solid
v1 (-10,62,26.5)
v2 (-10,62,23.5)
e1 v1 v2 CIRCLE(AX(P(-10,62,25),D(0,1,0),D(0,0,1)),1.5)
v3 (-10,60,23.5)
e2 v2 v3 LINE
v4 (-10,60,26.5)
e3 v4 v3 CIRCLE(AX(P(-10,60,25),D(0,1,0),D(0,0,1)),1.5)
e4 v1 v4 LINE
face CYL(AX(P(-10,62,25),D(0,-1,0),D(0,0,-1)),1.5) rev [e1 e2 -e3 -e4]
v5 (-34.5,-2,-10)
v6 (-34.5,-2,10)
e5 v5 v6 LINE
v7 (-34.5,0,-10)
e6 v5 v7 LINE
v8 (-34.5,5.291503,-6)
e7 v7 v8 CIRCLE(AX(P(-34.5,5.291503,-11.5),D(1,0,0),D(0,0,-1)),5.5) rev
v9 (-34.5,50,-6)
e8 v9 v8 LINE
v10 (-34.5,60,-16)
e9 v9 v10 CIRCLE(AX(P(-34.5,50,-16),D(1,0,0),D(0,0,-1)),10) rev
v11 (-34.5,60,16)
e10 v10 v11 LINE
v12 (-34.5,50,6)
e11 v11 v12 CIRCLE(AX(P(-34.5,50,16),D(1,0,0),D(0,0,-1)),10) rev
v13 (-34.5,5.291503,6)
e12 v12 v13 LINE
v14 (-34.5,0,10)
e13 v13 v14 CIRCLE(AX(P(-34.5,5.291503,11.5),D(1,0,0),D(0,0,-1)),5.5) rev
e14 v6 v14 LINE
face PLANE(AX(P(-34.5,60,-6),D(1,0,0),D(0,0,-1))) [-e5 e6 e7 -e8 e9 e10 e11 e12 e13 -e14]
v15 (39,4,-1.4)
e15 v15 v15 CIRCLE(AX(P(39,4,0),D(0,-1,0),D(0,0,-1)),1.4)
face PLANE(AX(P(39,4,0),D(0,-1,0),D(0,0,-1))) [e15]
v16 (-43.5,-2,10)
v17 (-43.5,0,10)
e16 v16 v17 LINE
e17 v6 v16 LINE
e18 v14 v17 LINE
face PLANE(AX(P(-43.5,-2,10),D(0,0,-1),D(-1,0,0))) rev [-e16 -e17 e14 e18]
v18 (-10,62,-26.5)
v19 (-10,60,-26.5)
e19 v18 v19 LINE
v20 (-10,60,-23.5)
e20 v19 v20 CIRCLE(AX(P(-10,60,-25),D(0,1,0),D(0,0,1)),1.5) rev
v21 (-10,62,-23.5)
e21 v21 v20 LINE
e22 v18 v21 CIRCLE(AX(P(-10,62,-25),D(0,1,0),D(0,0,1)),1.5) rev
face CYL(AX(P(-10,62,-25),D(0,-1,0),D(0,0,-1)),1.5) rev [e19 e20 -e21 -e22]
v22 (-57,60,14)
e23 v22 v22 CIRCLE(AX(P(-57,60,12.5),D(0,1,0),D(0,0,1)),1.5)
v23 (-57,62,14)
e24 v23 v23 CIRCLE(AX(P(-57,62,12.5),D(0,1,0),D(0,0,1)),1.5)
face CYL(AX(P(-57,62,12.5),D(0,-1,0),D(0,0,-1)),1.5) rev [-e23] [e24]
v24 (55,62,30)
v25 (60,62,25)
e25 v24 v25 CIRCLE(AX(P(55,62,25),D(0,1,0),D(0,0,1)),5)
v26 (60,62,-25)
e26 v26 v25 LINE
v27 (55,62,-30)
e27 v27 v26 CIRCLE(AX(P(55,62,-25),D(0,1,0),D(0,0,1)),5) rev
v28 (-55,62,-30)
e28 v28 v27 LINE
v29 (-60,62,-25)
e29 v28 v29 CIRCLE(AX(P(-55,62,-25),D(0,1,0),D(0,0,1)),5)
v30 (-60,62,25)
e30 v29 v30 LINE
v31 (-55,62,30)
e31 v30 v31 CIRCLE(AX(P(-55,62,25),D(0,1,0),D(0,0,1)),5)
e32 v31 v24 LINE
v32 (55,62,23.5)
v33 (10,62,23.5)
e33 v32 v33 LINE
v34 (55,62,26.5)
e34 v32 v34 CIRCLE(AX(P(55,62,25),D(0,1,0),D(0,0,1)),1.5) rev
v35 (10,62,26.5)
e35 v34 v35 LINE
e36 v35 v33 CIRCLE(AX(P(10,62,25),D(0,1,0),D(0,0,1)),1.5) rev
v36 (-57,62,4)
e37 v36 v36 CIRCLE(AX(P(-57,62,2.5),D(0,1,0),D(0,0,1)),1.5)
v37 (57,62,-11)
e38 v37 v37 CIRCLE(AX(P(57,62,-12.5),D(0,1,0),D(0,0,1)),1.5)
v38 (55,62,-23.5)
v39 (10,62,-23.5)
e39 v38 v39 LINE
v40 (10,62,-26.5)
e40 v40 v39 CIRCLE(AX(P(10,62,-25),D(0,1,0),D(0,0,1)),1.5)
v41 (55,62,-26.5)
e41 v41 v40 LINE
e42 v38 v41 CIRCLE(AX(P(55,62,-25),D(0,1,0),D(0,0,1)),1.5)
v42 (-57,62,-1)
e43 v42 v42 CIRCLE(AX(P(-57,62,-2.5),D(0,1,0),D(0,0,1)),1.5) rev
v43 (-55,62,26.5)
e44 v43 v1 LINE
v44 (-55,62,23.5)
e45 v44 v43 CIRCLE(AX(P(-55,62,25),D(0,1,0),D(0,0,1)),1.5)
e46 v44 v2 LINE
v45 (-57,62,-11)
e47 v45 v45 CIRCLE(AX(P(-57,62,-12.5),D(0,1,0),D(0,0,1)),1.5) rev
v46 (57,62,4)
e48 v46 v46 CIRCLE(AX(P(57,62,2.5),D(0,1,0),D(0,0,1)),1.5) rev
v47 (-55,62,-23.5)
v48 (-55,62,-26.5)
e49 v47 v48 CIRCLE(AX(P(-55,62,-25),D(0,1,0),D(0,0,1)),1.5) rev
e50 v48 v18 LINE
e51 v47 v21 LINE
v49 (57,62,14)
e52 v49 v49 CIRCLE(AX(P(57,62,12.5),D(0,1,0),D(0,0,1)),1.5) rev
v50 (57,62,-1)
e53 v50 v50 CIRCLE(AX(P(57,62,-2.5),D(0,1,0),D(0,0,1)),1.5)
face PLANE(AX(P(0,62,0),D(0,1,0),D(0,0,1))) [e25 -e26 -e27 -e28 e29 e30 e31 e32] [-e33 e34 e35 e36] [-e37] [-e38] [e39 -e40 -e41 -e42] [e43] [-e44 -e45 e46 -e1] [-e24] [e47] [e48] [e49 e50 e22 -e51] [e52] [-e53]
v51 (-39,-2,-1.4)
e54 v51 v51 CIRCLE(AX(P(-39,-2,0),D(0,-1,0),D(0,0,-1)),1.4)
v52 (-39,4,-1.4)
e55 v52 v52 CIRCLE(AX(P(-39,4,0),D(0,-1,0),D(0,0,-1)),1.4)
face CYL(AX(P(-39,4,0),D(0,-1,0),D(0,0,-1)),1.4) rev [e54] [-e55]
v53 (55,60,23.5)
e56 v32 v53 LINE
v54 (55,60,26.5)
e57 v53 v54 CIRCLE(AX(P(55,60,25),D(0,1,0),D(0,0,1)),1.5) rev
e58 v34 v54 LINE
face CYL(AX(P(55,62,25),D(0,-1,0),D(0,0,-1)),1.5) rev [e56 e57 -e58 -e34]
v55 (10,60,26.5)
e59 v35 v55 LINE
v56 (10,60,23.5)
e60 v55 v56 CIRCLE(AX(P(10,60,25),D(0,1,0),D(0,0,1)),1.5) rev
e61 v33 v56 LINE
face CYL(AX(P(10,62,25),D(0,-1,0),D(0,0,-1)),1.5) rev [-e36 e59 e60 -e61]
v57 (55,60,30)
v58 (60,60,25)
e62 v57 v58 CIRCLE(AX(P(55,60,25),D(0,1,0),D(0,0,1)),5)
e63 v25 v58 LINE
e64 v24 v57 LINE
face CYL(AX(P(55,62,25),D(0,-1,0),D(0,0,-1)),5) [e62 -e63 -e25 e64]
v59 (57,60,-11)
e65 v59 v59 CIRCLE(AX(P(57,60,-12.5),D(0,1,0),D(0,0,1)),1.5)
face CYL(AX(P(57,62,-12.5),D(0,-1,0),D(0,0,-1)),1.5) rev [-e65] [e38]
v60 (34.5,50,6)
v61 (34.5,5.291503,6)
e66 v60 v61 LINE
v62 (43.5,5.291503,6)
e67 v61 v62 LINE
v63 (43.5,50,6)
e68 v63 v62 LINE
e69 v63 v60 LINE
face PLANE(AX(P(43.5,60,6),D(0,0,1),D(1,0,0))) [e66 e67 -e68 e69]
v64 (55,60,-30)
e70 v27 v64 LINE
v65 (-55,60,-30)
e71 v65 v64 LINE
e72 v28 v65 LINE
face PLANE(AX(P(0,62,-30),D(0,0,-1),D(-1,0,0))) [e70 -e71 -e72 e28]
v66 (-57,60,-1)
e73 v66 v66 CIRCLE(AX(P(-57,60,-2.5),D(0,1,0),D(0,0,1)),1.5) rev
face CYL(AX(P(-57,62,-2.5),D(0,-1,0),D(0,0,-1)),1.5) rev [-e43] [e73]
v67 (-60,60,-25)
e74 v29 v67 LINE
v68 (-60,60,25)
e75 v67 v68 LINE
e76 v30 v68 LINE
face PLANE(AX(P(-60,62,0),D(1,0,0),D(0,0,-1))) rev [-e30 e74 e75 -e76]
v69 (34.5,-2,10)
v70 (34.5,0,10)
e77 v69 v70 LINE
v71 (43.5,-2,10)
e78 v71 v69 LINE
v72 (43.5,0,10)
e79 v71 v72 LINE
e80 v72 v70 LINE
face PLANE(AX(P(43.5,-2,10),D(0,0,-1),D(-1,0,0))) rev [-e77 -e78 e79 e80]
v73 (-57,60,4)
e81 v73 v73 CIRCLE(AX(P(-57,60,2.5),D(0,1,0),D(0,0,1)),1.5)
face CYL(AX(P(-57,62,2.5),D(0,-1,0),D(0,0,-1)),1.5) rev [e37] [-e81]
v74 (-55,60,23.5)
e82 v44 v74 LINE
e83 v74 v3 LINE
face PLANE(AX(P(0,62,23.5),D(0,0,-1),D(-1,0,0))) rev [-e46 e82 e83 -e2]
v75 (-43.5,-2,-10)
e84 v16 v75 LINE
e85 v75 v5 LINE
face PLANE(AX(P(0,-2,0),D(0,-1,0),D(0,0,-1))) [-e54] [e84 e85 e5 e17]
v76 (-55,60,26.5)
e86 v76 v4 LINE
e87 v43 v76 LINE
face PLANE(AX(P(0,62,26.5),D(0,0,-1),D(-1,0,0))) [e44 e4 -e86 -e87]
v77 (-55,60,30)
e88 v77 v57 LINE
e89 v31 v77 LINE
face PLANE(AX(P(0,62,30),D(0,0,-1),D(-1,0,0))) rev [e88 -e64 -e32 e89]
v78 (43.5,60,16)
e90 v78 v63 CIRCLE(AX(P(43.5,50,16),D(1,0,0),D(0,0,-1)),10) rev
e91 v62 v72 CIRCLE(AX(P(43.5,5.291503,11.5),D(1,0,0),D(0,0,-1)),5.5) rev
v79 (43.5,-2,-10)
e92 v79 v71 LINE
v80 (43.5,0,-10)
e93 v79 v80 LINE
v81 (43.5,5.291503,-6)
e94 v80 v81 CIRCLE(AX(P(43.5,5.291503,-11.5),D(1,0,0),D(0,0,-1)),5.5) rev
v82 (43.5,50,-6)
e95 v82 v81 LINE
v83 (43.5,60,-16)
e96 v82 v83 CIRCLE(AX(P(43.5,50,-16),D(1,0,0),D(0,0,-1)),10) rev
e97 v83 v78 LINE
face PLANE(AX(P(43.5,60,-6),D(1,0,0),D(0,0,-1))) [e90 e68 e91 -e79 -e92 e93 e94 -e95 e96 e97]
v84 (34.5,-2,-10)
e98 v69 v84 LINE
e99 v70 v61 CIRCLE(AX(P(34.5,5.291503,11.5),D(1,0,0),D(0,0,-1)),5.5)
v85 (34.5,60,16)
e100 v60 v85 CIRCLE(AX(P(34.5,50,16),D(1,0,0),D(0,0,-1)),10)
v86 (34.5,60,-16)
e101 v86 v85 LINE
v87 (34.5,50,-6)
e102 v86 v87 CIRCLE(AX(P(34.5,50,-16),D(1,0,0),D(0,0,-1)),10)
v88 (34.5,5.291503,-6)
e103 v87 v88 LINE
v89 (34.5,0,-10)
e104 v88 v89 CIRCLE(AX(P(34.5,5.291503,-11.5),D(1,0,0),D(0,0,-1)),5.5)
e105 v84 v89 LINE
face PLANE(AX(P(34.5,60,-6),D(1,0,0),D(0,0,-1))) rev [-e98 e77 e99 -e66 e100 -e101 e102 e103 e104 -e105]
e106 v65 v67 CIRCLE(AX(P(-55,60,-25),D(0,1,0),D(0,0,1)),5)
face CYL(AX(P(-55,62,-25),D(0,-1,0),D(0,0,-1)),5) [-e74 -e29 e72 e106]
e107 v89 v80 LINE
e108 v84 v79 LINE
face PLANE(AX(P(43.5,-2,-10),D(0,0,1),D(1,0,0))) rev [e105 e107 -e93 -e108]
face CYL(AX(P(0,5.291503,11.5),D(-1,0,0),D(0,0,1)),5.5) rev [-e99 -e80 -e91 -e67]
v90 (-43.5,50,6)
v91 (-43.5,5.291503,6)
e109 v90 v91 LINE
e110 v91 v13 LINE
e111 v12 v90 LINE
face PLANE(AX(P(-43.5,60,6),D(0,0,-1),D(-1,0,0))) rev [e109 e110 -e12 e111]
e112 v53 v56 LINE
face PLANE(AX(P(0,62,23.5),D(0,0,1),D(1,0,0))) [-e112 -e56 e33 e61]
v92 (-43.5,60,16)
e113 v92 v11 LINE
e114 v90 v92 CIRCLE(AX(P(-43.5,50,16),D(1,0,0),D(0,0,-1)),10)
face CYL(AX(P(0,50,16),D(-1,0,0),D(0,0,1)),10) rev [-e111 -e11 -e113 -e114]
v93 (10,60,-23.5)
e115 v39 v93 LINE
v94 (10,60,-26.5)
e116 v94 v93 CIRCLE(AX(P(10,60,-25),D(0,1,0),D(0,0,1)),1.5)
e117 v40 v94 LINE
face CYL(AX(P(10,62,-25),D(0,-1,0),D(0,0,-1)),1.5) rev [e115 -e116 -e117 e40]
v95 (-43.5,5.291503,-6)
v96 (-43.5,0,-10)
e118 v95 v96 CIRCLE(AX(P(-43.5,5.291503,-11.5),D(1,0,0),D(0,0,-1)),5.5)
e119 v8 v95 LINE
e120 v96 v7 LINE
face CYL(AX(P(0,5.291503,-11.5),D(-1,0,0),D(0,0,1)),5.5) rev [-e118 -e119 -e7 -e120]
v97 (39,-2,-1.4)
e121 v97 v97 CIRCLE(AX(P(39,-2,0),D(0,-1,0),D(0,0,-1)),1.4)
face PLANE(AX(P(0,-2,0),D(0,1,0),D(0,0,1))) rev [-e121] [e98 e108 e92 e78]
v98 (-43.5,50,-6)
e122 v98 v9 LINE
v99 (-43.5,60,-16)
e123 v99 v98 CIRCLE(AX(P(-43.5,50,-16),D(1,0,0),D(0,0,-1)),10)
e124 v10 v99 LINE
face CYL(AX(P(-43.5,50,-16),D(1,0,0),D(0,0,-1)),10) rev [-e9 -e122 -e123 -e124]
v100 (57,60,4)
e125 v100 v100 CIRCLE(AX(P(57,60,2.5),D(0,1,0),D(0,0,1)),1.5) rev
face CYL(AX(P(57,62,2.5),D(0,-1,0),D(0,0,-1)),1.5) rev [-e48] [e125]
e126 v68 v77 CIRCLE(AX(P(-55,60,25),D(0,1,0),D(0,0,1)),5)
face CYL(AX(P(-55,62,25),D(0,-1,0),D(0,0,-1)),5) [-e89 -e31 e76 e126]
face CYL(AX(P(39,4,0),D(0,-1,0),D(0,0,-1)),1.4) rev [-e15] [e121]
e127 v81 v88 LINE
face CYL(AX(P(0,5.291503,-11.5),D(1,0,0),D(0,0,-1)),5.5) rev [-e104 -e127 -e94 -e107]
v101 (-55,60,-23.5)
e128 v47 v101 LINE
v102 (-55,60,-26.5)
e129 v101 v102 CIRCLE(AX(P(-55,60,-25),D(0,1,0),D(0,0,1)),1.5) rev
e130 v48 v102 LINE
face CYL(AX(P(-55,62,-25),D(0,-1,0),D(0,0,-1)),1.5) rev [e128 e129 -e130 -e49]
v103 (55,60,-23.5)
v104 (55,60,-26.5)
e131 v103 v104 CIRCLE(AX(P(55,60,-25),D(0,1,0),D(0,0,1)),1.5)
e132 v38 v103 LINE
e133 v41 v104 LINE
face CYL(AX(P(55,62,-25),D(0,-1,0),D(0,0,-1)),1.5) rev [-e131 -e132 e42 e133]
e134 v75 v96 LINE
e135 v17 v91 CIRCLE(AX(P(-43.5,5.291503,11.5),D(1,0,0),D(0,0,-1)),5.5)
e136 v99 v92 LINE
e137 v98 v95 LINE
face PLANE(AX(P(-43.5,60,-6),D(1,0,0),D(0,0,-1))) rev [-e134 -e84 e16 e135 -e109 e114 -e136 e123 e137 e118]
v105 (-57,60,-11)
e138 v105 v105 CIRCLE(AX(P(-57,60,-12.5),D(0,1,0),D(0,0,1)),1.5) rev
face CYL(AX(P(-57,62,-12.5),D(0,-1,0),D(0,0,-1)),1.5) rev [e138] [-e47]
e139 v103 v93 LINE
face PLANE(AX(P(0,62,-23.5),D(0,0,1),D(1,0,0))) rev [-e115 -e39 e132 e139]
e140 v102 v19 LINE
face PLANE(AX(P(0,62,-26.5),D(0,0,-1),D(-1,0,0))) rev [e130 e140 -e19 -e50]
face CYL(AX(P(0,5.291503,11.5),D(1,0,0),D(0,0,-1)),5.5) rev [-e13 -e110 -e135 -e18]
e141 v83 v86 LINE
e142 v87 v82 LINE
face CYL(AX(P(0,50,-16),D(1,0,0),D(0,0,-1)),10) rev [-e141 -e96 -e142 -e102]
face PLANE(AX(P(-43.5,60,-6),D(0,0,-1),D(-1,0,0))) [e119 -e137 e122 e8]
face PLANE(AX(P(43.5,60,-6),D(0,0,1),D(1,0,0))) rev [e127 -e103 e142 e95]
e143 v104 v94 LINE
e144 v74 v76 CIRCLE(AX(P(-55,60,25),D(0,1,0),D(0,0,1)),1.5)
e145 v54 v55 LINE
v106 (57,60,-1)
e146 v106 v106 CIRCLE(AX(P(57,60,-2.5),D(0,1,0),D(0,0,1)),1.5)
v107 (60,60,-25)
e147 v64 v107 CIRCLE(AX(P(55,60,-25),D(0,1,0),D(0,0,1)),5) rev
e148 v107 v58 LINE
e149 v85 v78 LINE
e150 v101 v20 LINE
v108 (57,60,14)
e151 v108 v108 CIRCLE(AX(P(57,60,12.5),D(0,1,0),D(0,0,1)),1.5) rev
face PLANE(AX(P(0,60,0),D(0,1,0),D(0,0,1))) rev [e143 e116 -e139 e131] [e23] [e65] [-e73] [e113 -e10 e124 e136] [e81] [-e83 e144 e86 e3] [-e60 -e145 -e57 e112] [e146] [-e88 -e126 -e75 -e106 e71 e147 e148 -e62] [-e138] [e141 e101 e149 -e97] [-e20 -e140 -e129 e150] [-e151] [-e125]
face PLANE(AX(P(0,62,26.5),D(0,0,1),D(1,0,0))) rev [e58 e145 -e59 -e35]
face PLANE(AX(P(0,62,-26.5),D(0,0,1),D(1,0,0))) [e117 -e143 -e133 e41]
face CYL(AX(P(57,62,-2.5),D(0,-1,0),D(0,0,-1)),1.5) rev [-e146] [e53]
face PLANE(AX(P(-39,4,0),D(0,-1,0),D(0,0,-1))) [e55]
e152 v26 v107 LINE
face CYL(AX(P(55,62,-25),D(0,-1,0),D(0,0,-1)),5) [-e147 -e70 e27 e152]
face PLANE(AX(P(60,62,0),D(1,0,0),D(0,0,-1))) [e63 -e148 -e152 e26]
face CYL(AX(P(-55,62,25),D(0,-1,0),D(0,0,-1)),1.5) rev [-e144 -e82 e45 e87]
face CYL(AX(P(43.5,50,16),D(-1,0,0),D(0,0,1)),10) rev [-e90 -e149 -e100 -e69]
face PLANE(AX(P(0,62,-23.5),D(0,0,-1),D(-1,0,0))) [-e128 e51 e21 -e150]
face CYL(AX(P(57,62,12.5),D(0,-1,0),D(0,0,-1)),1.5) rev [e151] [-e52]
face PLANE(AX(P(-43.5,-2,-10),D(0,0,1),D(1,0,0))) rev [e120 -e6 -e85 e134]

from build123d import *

# Parameters (mm, degrees)
SKETCH1_W             = 9
SKETCH1_H             = 12
BOSS_EXTRUDE1_DEPTH   = 60
BOSS_EXTRUDE1_2_DEPTH = 60
SKETCH2_W             = 9
SKETCH2_H             = 20
BOSS_EXTRUDE2_DEPTH   = 2
SKETCH3_R             = 1.4
CUT_EXTRUDE1_DEPTH    = 6
FILLET1_R             = 5.5
FILLET2_R             = 5.5
SKETCH4_R             = 1.5
BOSS_EXTRUDE4_DEPTH   = 2
FILLET4_R             = 10


with BuildPart() as part:
    # Sketch1 → Boss-Extrude1 (new body)
    with BuildSketch(Plane(origin=(0, 0, 0), x_dir=(1, 0, 0), z_dir=(0, 1, 0))):
        with Locations((39, 0)):
            Rectangle(SKETCH1_W, SKETCH1_H)
    extrude(amount=BOSS_EXTRUDE1_DEPTH)



with BuildPart() as body_2:
    # Sketch1 → Boss-Extrude1 2 (new body)
    with BuildSketch(Plane(origin=(0, 0, 0), x_dir=(1, 0, 0), z_dir=(0, 1, 0))):
        with Locations((-39, 0)):
            Rectangle(SKETCH1_W, SKETCH1_H)
    extrude(amount=BOSS_EXTRUDE1_2_DEPTH)


with BuildPart() as part_1:
    add(part.part)

    add(body_2.part)  # Boss-Extrude2 merges body 2
    # Sketch2 → Boss-Extrude2 (add)
    with BuildSketch(Plane.XZ):
        with Locations((-39, 0)):
            Rectangle(SKETCH2_W, SKETCH2_H)
        with Locations((39, 0)):
            Rectangle(SKETCH2_W, SKETCH2_H)
    extrude(amount=BOSS_EXTRUDE2_DEPTH)

    # Sketch3 → Cut-Extrude1 (cut)
    with BuildSketch(Plane.XZ.offset(2)):
        with Locations(Location((39, 0, 0), (0, 0, 270))):
            Circle(SKETCH3_R)
        with Locations(Location((-39, 0, 0), (0, 0, 270))):
            Circle(SKETCH3_R)
    extrude(amount=-CUT_EXTRUDE1_DEPTH, mode=Mode.SUBTRACT)

    # Fillet1
    # the kernel refuses this fillet: 5.5 mm, written as the material it adds along each edge
    with BuildSketch(Plane(origin=(-43.5, 0, -6), x_dir=(0, 1, 0), z_dir=(1, 0, 0))) as fillet1_piece_1:
        with BuildLine():
            CenterArc((5.291502622, -5.5), FILLET1_R, 90, 74.173379868)
            Line((0, -4), (-0.105830052, -3.97))
            ThreePointArc((-0.105830052, -3.97), (-0.11, -2), (-0.11, 0))
            Line((-0.11, 0), (0, 0.11))
            Line((0, 0.11), (5.291502622, 0.11))
            Line((5.291502622, 0.11), (5.291502622, 0))
        make_face()
    extrude(amount=9)
    with BuildSketch(Plane(origin=(-34.5, 0, 6), x_dir=(0, 0, 1), z_dir=(-1, 0, 0))) as fillet1_piece_2:
        with BuildLine():
            CenterArc((5.5, 5.291502622), FILLET1_R, 180, 74.173379868)
            Line((0, 5.291502622), (-0.11, 5.291502622))
            Line((-0.11, 5.291502622), (-0.11, 0))
            Line((-0.11, 0), (0, -0.11))
            ThreePointArc((0, -0.11), (2, -0.11), (3.97, -0.105830052))
            Line((3.97, -0.105830052), (4, 0))
        make_face()
    extrude(amount=9)

    # Fillet2
    # the kernel refuses this fillet: 5.5 mm, written as the material it adds along each edge
    with BuildSketch(Plane(origin=(34.5, 0, -6), x_dir=(0, 0, -1), z_dir=(1, 0, 0))) as fillet2_piece_1:
        with BuildLine():
            CenterArc((5.5, 5.291502622), FILLET2_R, 180, 74.173379868)
            Line((0, 5.291502622), (-0.11, 5.291502622))
            Line((-0.11, 5.291502622), (-0.11, 0))
            Line((-0.11, 0), (0, -0.11))
            ThreePointArc((0, -0.11), (2, -0.11), (3.97, -0.105830052))
            Line((3.97, -0.105830052), (4, 0))
        make_face()
    extrude(amount=9)
    with BuildSketch(Plane(origin=(43.5, 0, 6), x_dir=(0, 1, 0), z_dir=(-1, 0, 0))) as fillet2_piece_2:
        with BuildLine():
            CenterArc((5.291502622, -5.5), FILLET2_R, 90, 74.173379868)
            Line((0, -4), (-0.105830052, -3.97))
            ThreePointArc((-0.105830052, -3.97), (-0.11, -2), (-0.11, 0))
            Line((-0.11, 0), (0, 0.11))
            Line((0, 0.11), (5.291502622, 0.11))
            Line((5.291502622, 0.11), (5.291502622, 0))
        make_face()
    extrude(amount=9)

    # Sketch4 → Boss-Extrude4 (add)
    with BuildSketch(Plane(origin=(0, 60, 0), x_dir=(1, 0, 0), z_dir=(0, 1, 0))):
        with BuildLine():
            Line((-55, 30), (55, 30))
            ThreePointArc((55, 30), (58.535533906, 28.535533906), (60, 25))
            Line((60, 25), (60, -25))
            ThreePointArc((60, -25), (58.535533906, -28.535533906), (55, -30))
            Line((55, -30), (-55, -30))
            ThreePointArc((-55, -30), (-58.535533906, -28.535533906), (-60, -25))
            Line((-60, -25), (-60, 25))
            ThreePointArc((-60, 25), (-58.535533906, 28.535533906), (-55, 30))
        make_face()
        with Locations(Location((-57, -2.5, 0), (0, 0, 270))):
            Circle(SKETCH4_R, mode=Mode.SUBTRACT)
        with Locations(Location((-57, -12.5, 0), (0, 0, 270))):
            Circle(SKETCH4_R, mode=Mode.SUBTRACT)
        with Locations(Location((57, -12.5, 0), (0, 0, 270))):
            Circle(SKETCH4_R, mode=Mode.SUBTRACT)
        with Locations(Location((57, -2.5, 0), (0, 0, 270))):
            Circle(SKETCH4_R, mode=Mode.SUBTRACT)
        with Locations(Location((57, 2.5, 0), (0, 0, 270))):
            Circle(SKETCH4_R, mode=Mode.SUBTRACT)
        with Locations(Location((57, 12.5, 0), (0, 0, 270))):
            Circle(SKETCH4_R, mode=Mode.SUBTRACT)
        with Locations(Location((-57, 12.5, 0), (0, 0, 270))):
            Circle(SKETCH4_R, mode=Mode.SUBTRACT)
        with Locations(Location((-57, 2.5, 0), (0, 0, 270))):
            Circle(SKETCH4_R, mode=Mode.SUBTRACT)
        with BuildLine():
            Line((55, 23.5), (10, 23.5))
            ThreePointArc((10, 23.5), (8.5, 25), (10, 26.5))
            Line((10, 26.5), (55, 26.5))
            ThreePointArc((55, 26.5), (56.5, 25), (55, 23.5))
        make_face(mode=Mode.SUBTRACT)
        with BuildLine():
            Line((-55, -23.5), (-10, -23.5))
            ThreePointArc((-10, -23.5), (-8.5, -25), (-10, -26.5))
            Line((-10, -26.5), (-55, -26.5))
            ThreePointArc((-55, -26.5), (-56.5, -25), (-55, -23.5))
        make_face(mode=Mode.SUBTRACT)
        with BuildLine():
            Line((-55, 23.5), (-10, 23.5))
            ThreePointArc((-10, 23.5), (-8.5, 25), (-10, 26.5))
            Line((-10, 26.5), (-55, 26.5))
            ThreePointArc((-55, 26.5), (-56.5, 25), (-55, 23.5))
        make_face(mode=Mode.SUBTRACT)
        with BuildLine():
            Line((55, -23.5), (10, -23.5))
            ThreePointArc((10, -23.5), (8.5, -25), (10, -26.5))
            Line((10, -26.5), (55, -26.5))
            ThreePointArc((55, -26.5), (56.5, -25), (55, -23.5))
        make_face(mode=Mode.SUBTRACT)
    extrude(amount=BOSS_EXTRUDE4_DEPTH)

    # Fillet4
    fillet4_edges = [part_1.edges().sort_by_distance(p)[0] for p in [
        (39, 60, 6),
        (39, 60, -6),
        (-39, 60, -6),
        (-39, 60, 6),
    ]]
    fillet(fillet4_edges, radius=FILLET4_R)


solid = part_1.part
